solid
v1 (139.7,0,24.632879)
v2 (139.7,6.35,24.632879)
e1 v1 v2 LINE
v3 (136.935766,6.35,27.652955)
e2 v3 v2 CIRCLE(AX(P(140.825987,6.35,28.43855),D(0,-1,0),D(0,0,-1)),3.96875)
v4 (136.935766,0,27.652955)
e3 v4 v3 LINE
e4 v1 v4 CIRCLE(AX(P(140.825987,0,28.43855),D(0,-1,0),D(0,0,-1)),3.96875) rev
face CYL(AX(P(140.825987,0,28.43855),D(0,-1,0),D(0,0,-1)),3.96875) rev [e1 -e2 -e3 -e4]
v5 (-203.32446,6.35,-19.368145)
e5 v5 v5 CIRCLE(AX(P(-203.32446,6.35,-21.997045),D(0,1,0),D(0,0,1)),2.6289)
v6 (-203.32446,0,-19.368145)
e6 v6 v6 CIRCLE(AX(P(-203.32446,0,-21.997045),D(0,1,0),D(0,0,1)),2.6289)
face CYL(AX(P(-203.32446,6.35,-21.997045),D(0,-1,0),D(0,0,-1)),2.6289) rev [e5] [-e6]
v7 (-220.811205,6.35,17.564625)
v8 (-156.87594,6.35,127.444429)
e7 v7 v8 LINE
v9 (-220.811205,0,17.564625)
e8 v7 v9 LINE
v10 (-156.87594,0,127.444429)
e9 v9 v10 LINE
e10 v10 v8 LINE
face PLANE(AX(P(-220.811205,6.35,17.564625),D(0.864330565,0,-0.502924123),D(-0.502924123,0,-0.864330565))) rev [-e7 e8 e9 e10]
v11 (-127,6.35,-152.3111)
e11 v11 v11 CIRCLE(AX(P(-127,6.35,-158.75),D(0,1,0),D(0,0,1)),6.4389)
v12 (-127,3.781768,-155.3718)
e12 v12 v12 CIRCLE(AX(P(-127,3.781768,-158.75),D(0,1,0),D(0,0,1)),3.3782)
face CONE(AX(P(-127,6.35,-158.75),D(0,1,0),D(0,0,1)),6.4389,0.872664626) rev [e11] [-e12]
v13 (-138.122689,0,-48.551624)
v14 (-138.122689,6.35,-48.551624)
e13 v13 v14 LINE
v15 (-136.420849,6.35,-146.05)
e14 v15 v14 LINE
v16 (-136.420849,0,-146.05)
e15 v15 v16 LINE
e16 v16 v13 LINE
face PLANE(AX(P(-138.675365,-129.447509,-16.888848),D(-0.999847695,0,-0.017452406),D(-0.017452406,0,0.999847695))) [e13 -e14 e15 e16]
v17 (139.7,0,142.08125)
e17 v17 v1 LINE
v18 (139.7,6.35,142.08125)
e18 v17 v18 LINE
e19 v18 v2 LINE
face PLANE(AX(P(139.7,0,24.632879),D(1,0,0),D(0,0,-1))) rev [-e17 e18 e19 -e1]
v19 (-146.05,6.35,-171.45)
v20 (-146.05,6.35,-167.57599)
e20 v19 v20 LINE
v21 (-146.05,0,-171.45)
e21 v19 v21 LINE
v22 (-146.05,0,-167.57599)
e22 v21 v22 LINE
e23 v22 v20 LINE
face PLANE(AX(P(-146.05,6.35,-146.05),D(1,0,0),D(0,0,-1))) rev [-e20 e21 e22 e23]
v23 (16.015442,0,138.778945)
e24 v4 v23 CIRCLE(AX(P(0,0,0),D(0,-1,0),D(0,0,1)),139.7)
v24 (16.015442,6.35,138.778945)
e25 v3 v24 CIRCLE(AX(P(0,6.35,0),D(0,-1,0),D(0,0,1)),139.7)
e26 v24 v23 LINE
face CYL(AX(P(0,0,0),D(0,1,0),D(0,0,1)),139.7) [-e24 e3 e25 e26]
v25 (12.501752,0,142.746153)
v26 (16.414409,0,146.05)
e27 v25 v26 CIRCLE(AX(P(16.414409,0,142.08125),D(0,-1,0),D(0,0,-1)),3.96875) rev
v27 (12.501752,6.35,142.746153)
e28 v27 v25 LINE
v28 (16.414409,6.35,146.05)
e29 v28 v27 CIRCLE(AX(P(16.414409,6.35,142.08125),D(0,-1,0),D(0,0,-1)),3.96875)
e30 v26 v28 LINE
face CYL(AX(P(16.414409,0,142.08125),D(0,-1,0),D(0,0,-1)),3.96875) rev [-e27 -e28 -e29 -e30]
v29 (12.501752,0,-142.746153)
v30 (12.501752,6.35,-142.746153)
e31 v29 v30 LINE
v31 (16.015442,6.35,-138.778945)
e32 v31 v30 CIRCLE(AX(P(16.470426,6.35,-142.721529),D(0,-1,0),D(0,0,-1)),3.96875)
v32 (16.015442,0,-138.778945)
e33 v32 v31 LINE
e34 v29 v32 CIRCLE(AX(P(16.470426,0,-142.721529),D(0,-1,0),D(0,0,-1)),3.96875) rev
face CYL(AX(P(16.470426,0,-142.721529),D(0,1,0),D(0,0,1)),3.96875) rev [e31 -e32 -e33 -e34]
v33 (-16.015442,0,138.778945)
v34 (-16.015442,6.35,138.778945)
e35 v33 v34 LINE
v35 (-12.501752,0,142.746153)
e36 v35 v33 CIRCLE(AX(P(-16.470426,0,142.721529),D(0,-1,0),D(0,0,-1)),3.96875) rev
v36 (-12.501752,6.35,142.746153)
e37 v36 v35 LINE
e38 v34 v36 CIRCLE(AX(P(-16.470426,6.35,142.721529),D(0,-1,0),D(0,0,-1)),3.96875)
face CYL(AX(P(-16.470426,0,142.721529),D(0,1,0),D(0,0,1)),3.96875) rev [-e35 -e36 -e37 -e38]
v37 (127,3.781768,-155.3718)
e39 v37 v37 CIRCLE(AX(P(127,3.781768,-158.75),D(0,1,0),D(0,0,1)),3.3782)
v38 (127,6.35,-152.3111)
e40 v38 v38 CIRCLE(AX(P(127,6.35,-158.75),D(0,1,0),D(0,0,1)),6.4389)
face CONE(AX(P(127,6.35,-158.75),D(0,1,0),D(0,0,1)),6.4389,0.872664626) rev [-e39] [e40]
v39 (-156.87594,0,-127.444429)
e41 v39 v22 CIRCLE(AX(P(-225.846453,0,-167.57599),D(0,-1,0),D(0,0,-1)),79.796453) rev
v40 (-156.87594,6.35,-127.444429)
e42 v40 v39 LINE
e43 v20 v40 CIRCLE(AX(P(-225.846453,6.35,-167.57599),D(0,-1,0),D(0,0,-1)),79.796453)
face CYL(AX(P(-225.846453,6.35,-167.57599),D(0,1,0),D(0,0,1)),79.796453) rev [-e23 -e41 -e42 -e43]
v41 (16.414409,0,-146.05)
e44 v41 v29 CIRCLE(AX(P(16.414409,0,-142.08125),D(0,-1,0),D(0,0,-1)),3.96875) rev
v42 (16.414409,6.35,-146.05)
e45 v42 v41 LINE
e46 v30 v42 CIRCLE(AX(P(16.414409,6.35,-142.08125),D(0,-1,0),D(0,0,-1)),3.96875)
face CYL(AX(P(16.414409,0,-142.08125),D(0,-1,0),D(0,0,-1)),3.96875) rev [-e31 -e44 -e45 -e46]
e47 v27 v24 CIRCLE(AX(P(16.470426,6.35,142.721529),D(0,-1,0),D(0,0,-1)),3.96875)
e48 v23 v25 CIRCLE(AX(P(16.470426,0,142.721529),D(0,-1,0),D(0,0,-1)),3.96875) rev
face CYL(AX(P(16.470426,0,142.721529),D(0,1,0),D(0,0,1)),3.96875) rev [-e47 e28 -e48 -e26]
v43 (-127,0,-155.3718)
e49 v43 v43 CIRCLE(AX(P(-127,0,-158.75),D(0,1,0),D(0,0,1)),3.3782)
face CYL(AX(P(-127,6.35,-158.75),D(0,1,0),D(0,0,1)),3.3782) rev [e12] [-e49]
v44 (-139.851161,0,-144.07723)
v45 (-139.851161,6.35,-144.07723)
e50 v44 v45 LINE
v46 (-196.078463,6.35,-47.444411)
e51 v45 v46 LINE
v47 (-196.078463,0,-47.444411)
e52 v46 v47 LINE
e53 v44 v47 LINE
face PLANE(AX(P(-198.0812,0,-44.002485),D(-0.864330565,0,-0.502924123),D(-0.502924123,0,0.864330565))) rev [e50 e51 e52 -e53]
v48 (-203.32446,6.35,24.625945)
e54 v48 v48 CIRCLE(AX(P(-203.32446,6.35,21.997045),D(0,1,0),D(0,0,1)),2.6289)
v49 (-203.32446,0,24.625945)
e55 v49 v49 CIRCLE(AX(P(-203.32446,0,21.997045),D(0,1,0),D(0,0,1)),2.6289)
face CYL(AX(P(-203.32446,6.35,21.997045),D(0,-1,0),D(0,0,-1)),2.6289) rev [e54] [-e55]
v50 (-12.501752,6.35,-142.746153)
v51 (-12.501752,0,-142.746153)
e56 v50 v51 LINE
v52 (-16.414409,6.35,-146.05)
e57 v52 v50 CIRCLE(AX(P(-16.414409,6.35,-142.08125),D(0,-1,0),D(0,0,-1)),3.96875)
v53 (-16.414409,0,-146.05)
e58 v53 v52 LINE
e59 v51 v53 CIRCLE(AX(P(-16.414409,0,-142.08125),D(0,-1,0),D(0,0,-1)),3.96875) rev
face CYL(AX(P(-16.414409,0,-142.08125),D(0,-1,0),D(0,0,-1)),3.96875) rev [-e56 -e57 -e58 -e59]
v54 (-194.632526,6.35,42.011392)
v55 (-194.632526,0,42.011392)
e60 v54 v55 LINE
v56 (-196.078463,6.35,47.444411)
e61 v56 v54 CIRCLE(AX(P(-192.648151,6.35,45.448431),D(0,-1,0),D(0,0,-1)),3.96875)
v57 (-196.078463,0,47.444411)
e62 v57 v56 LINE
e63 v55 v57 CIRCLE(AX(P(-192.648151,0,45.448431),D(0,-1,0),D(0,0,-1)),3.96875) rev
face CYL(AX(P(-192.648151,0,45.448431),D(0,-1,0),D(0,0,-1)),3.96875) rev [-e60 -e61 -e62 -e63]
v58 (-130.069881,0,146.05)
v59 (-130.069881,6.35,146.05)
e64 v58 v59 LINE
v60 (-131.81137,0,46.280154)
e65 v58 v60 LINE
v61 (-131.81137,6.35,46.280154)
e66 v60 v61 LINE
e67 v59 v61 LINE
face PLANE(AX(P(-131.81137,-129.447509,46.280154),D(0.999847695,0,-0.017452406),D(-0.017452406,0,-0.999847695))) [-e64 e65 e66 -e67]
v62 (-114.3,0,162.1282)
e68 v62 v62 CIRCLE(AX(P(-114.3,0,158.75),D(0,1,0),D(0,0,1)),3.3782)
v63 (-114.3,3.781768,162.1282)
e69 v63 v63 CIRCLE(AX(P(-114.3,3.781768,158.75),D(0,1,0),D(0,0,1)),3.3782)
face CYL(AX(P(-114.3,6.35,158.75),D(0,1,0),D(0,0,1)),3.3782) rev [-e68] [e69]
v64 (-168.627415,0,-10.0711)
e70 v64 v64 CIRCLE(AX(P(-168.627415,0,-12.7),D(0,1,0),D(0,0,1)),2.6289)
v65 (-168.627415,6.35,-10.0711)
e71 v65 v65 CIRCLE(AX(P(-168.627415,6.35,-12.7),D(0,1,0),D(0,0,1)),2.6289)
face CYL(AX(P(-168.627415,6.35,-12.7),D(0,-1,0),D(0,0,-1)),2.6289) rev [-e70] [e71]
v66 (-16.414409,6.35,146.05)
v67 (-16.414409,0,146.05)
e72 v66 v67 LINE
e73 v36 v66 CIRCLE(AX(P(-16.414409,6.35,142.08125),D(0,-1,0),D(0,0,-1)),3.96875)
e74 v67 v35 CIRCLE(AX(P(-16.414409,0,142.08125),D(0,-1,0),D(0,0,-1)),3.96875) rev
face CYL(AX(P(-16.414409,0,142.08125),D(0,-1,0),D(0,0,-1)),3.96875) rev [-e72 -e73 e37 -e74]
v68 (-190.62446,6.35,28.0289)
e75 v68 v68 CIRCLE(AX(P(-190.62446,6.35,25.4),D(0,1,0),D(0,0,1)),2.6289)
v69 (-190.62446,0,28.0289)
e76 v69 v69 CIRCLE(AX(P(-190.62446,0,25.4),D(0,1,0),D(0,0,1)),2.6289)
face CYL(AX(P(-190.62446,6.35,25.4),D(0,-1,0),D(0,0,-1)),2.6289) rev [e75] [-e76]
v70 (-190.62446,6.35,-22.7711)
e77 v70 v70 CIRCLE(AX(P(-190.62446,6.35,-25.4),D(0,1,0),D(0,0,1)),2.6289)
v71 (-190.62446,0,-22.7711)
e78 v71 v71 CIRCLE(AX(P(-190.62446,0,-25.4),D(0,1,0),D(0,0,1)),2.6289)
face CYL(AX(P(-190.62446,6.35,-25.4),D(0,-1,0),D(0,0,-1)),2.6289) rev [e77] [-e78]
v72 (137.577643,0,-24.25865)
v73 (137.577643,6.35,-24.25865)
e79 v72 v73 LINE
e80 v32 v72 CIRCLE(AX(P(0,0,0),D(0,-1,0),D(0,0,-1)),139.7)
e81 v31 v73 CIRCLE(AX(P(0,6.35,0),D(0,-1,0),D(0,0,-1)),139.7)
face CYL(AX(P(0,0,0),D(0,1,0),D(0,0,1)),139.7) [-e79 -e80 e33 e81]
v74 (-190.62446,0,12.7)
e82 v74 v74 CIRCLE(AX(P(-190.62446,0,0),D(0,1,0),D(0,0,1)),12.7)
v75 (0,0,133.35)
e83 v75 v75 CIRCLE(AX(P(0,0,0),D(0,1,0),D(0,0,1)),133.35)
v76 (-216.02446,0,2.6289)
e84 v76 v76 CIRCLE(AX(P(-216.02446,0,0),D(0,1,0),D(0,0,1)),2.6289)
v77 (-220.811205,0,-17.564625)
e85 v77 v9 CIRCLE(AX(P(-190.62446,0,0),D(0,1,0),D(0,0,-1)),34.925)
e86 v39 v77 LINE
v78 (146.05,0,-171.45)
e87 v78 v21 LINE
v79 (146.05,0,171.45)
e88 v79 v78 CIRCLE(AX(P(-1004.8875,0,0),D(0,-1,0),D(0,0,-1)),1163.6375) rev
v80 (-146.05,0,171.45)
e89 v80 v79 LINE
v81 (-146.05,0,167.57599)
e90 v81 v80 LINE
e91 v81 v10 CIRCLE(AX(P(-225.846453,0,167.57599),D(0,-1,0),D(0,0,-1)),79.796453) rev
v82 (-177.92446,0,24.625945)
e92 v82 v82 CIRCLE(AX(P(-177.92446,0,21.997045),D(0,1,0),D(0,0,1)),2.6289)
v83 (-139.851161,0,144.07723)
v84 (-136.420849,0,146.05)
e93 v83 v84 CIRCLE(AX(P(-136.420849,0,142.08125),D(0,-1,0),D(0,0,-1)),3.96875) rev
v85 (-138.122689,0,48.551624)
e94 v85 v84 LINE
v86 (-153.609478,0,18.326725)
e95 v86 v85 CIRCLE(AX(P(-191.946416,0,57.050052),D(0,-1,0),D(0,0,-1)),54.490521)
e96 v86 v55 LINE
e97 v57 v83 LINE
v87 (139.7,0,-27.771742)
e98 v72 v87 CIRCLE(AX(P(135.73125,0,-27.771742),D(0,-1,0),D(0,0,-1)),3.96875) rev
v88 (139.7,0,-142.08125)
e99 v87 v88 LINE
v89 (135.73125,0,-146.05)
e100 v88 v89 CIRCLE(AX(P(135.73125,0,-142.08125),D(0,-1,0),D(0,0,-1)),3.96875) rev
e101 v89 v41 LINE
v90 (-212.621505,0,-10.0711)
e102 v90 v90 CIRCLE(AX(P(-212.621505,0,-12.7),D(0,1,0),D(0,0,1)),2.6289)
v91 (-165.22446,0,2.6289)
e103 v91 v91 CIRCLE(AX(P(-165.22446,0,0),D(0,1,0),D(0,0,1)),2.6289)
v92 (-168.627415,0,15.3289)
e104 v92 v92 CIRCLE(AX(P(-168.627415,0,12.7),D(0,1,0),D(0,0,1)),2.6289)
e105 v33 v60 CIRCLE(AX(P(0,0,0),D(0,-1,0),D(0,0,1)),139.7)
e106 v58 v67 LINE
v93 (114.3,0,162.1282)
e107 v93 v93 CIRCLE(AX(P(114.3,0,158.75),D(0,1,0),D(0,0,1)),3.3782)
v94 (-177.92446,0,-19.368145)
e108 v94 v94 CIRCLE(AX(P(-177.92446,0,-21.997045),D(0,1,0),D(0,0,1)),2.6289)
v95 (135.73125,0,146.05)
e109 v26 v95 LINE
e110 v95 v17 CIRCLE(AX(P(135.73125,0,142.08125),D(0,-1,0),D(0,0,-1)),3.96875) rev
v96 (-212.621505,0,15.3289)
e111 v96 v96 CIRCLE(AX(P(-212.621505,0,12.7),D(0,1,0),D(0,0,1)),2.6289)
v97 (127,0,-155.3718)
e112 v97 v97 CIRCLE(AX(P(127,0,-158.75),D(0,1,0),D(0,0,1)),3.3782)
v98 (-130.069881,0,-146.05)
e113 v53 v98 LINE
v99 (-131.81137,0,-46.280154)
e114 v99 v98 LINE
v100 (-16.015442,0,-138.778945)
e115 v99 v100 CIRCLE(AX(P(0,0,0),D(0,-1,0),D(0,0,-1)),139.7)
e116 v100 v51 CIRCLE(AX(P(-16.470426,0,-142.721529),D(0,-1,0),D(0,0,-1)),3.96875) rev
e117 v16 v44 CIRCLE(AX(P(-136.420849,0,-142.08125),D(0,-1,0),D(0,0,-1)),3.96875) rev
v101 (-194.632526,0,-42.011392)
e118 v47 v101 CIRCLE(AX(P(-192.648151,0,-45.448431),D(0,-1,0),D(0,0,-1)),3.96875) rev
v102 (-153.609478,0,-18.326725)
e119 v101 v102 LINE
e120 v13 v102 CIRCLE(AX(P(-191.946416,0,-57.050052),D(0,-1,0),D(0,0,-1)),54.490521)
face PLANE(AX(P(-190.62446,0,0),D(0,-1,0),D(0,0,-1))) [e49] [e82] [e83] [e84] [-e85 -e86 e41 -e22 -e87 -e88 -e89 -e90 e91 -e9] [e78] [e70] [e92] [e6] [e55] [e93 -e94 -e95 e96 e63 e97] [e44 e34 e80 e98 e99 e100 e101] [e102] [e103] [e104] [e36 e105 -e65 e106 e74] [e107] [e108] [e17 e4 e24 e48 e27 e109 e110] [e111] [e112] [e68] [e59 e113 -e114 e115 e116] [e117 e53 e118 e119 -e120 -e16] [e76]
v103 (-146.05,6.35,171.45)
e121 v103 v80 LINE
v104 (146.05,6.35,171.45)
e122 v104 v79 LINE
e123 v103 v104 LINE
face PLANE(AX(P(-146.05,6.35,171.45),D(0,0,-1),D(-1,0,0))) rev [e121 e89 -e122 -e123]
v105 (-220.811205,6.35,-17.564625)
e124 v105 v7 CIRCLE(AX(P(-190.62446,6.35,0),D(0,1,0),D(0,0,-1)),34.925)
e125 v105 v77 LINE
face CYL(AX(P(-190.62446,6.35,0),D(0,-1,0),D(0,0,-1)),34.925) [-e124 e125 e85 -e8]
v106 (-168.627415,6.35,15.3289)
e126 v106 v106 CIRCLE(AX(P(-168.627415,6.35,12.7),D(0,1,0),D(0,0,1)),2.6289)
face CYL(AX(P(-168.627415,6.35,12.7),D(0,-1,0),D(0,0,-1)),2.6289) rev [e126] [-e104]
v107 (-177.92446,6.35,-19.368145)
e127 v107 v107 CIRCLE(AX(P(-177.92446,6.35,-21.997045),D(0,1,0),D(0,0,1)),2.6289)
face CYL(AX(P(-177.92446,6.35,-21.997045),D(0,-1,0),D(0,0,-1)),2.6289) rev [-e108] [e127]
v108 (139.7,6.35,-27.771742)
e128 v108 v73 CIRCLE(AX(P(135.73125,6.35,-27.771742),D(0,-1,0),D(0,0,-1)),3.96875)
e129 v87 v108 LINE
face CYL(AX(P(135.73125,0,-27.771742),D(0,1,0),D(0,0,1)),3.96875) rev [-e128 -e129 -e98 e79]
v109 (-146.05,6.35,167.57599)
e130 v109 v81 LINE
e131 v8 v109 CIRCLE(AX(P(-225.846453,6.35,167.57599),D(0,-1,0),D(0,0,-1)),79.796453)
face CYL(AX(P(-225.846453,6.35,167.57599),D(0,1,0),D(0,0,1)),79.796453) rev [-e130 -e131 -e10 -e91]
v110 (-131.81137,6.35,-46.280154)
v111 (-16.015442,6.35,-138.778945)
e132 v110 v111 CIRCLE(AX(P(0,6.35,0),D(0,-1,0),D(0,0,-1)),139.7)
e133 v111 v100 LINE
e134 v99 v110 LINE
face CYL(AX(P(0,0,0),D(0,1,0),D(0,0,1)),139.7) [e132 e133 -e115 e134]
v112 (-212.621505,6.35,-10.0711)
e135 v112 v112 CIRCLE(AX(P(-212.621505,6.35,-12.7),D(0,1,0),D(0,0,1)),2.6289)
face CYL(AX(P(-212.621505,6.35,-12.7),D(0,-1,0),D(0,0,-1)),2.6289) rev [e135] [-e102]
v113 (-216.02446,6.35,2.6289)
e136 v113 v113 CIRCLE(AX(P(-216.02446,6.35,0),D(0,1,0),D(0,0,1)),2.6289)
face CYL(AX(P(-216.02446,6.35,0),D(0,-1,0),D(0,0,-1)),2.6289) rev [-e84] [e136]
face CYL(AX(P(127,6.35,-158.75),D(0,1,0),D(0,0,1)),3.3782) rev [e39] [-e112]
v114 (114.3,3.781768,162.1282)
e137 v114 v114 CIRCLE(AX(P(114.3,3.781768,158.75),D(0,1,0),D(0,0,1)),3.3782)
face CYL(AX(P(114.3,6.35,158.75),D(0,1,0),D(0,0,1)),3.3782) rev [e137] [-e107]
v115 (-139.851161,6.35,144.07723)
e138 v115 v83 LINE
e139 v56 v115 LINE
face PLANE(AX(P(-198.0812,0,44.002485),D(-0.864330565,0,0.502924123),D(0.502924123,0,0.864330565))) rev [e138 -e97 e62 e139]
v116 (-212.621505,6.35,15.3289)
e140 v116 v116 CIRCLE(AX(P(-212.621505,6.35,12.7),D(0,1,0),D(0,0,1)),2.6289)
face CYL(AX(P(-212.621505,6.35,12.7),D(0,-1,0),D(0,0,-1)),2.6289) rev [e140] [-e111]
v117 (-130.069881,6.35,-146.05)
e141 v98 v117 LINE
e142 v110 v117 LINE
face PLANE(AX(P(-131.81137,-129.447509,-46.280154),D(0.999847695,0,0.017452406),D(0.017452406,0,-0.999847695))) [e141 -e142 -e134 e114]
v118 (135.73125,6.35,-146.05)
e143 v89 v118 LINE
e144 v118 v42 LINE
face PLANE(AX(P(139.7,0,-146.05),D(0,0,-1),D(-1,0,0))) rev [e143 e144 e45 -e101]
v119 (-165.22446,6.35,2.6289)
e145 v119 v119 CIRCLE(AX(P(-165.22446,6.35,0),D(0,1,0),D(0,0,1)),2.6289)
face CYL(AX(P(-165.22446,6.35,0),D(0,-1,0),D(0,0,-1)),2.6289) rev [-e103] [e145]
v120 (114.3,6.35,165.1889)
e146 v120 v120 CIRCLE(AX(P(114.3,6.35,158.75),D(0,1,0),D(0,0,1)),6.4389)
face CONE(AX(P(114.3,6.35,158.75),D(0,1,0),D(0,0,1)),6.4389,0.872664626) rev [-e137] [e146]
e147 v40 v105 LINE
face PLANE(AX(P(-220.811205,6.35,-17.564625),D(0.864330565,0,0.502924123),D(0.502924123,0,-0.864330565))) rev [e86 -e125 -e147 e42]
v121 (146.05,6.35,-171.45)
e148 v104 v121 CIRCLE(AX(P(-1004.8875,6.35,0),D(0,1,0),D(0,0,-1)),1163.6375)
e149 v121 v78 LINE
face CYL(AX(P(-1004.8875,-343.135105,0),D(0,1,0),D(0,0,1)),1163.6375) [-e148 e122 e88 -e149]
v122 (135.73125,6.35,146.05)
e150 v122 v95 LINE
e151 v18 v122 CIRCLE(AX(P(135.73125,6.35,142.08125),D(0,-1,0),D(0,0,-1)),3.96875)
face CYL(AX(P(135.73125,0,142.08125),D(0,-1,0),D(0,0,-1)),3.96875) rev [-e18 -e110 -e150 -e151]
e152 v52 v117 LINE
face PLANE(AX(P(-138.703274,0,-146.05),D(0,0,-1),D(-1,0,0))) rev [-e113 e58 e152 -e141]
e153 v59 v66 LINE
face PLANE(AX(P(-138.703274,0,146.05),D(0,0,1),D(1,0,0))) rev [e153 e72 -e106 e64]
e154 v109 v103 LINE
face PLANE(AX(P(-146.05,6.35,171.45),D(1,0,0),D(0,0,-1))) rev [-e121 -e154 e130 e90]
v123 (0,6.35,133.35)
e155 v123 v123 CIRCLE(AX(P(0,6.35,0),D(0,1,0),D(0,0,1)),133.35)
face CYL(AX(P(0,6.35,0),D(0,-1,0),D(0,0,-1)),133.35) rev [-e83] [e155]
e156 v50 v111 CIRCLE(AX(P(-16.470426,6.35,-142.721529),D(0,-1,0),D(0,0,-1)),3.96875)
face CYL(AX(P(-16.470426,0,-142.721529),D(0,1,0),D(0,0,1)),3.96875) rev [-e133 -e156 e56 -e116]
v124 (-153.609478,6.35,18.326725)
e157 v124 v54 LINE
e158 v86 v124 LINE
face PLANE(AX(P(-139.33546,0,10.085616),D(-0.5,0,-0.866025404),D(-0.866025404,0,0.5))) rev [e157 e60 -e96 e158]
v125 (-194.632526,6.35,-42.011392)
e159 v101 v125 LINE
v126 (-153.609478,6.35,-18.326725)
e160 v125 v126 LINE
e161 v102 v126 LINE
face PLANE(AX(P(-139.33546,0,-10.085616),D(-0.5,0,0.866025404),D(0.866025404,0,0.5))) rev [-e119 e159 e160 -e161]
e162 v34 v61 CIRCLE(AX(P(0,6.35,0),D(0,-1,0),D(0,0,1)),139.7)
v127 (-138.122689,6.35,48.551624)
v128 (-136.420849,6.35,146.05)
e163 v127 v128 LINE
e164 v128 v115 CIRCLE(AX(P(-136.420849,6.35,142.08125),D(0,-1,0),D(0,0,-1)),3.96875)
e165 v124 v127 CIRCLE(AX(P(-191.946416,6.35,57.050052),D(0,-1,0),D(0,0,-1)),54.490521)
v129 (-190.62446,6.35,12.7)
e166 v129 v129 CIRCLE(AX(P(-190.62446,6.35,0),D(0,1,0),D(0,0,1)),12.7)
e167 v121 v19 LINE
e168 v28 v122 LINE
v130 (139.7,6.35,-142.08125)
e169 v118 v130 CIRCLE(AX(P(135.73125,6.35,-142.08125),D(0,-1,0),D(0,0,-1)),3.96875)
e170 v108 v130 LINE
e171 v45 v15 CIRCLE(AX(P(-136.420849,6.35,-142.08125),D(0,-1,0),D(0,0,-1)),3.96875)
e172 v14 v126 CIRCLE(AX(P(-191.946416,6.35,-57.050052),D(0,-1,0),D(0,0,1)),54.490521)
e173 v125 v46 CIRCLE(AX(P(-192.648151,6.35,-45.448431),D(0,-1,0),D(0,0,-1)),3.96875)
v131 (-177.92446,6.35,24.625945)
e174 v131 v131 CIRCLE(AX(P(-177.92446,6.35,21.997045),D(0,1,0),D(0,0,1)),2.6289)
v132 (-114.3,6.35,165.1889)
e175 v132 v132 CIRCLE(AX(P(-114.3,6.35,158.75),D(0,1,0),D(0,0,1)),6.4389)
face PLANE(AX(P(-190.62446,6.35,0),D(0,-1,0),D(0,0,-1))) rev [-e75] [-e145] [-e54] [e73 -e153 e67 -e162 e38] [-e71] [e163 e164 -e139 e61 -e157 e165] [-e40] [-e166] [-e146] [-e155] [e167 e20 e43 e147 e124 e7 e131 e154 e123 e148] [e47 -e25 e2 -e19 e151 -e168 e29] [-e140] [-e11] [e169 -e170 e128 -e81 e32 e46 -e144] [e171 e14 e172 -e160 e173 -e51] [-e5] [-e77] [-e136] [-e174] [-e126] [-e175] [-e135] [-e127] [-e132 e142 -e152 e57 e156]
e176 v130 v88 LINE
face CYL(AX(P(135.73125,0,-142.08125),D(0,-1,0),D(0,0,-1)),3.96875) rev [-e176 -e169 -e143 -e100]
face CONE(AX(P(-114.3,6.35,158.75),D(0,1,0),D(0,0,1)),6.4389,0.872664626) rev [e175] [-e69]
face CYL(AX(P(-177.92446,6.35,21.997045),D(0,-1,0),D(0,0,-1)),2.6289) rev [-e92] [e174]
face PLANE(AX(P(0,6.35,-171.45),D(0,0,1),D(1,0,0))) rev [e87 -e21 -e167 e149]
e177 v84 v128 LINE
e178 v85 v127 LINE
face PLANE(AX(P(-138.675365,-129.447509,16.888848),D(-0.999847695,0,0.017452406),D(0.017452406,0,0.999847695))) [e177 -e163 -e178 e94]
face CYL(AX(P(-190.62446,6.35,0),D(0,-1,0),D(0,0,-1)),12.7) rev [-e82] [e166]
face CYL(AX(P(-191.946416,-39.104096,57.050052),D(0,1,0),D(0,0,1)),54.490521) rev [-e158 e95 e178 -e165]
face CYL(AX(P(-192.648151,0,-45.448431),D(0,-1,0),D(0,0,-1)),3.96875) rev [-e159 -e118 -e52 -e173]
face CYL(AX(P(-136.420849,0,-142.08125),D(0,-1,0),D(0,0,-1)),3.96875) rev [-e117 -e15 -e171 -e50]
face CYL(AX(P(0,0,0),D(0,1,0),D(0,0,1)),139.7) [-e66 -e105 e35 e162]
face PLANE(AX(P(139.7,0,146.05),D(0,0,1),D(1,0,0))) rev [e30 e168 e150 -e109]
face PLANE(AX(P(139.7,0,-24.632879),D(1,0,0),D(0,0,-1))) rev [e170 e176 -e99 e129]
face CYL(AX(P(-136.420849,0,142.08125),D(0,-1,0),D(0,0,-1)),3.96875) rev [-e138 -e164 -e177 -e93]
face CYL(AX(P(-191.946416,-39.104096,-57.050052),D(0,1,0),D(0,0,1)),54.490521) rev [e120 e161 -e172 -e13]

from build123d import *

# Parameters (mm, degrees)
SKETCH1_R                                           = 133.35
SKETCH1_R_2                                         = 12.7
SKETCH1_R_3                                         = 2.6289
EXTRUDE_CENTER_HOLE_DEPTH                           = 6.35
CSK_FOR_1_4_FLAT_HEAD_MACHINE_SCREW_100_D           = 6.7564
CSK_FOR_1_4_FLAT_HEAD_MACHINE_SCREW_100_CSINK_D     = 12.8778
CSK_FOR_1_4_FLAT_HEAD_MACHINE_SCREW_100_CSINK_ANGLE = 100
FILLET1_R                                           = 79.796453401
SLOTTING_DEPTH                                      = 284.386633253
FILLET5_R                                           = 3.96875
FILLET6_R                                           = 3.96875
FILLET7_R                                           = 3.96875
FILLET8_R                                           = 3.96875
MOTOR_SIDE_SUPPORTS_DEPTH                           = 6.35
OPPOSITE_MOTOR_SIDE_THICKENING_DEPTH                = 6.35
MOTOR_SIDE_THICKENING_DEPTH                         = 6.35


with BuildPart() as part:
    # Sketch1 → Extrude & center hole (new body)
    with BuildSketch(Plane(origin=(0, 0, 0), x_dir=(1, 0, 0), z_dir=(0, 1, 0))):
        with BuildLine():
            Line((0, 171.45), (146.05, 171.45))
            Line((146.05, 171.45), (146.05, 0))
            Line((146.05, 0), (146.05, -171.45))
            Line((146.05, -171.45), (-146.05, -171.45))
            Line((-146.05, -171.45), (-146.05, -146.05))
            Line((-146.05, -146.05), (-220.811204994, -17.564625007))
            ThreePointArc((-220.811204994, -17.564625007), (-225.54946, 0), (-220.811204994, 17.564625007))
            Line((-220.811204994, 17.564625007), (-146.05, 146.05))
            Line((-146.05, 146.05), (-146.05, 171.45))
            Line((-146.05, 171.45), (0, 171.45))
        make_face()
        with Locations(Location((0, 0, 0), (0, 0, 270))):
            Circle(SKETCH1_R, mode=Mode.SUBTRACT)
        with Locations(Location((-190.62446, 0, 0), (0, 0, 270))):
            Circle(SKETCH1_R_2, mode=Mode.SUBTRACT)
        with Locations(Location((-190.62446, 25.4, 0), (0, 0, 270))):
            Circle(SKETCH1_R_3, mode=Mode.SUBTRACT)
        with Locations(Location((-177.92446, 21.997045256, 0), (0, 0, 270))):
            Circle(SKETCH1_R_3, mode=Mode.SUBTRACT)
        with Locations(Location((-168.627414744, 12.7, 0), (0, 0, 270))):
            Circle(SKETCH1_R_3, mode=Mode.SUBTRACT)
        with Locations(Location((-165.22446, 0, 0), (0, 0, 270))):
            Circle(SKETCH1_R_3, mode=Mode.SUBTRACT)
        with Locations(Location((-168.627414744, -12.7, 0), (0, 0, 270))):
            Circle(SKETCH1_R_3, mode=Mode.SUBTRACT)
        with Locations(Location((-177.92446, -21.997045256, 0), (0, 0, 270))):
            Circle(SKETCH1_R_3, mode=Mode.SUBTRACT)
        with Locations(Location((-190.62446, -25.4, 0), (0, 0, 270))):
            Circle(SKETCH1_R_3, mode=Mode.SUBTRACT)
        with Locations(Location((-203.32446, -21.997045256, 0), (0, 0, 270))):
            Circle(SKETCH1_R_3, mode=Mode.SUBTRACT)
        with Locations(Location((-212.621505256, -12.7, 0), (0, 0, 270))):
            Circle(SKETCH1_R_3, mode=Mode.SUBTRACT)
        with Locations(Location((-216.02446, 0, 0), (0, 0, 270))):
            Circle(SKETCH1_R_3, mode=Mode.SUBTRACT)
        with Locations(Location((-212.621505256, 12.7, 0), (0, 0, 270))):
            Circle(SKETCH1_R_3, mode=Mode.SUBTRACT)
        with Locations(Location((-203.32446, 21.997045256, 0), (0, 0, 270))):
            Circle(SKETCH1_R_3, mode=Mode.SUBTRACT)
    extrude(amount=EXTRUDE_CENTER_HOLE_DEPTH)

    # CSK for 1/4 Flat Head Machine Screw (100)1 (through all)
    with Locations(Plane(origin=(0, 6.35, 0), x_dir=(1, 0, 0), z_dir=(0, 1, 0))):
        with Locations((-114.3, -158.75), (114.3, -158.75), (127, 158.75), (-127, 158.75)):
            CounterSinkHole(CSK_FOR_1_4_FLAT_HEAD_MACHINE_SCREW_100_D / 2, CSK_FOR_1_4_FLAT_HEAD_MACHINE_SCREW_100_CSINK_D / 2, counter_sink_angle=CSK_FOR_1_4_FLAT_HEAD_MACHINE_SCREW_100_CSINK_ANGLE)

    # Fillet1
    fillet1_edges = [part.edges().sort_by_distance(p)[0] for p in [
        (-146.05, 3.175, 146.05),
        (-146.05, 3.175, -146.05),
    ]]
    fillet(fillet1_edges, radius=FILLET1_R)

    # Sketch6 → Slotting (cut, through all)
    with BuildSketch(Plane(origin=(0, 6.35, 0), x_dir=(1, 0, 0), z_dir=(0, 1, 0))):
        with BuildLine():
            Line((-139.335459755, 10.085616241), (-198.081200359, 44.002485392))
            Line((-198.081200359, 44.002485392), (-138.703273811, 146.05))
            Line((-138.703273811, 146.05), (-12.777719308, 146.05))
            Line((-12.777719308, 146.05), (-12.175657262, 139.168399323))
            ThreePointArc((-12.175657262, 139.168399323), (-99.521333728, 98.03873792), (-139.335459755, 10.085616241))
        make_face()
        with BuildLine():
            Line((-198.081200359, -44.002485392), (-138.703273811, -146.05))
            Line((-138.703273811, -146.05), (-12.777719308, -146.05))
            Line((-12.777719308, -146.05), (-12.175657262, -139.168399323))
            ThreePointArc((-12.175657262, -139.168399323), (-99.521333728, -98.03873792), (-139.335459755, -10.085616241))
            Line((-139.335459755, -10.085616241), (-198.081200359, -44.002485392))
        make_face()
        with BuildLine():
            Line((139.7, 24.632879205), (139.7, 146.05))
            Line((139.7, 146.05), (12.777719308, 146.05))
            Line((12.777719308, 146.05), (12.175657262, 139.168399323))
            ThreePointArc((12.175657262, 139.168399323), (94.379952004, 102.997643952), (137.577643096, 24.25865042))
            Line((137.577643096, 24.25865042), (139.7, 24.632879205))
        make_face()
        with BuildLine():
            Line((137.577643096, -24.25865042), (139.7, -24.632879205))
            Line((139.7, -24.632879205), (139.7, -146.05))
            Line((139.7, -146.05), (12.777719308, -146.05))
            Line((12.777719308, -146.05), (12.175657262, -139.168399323))
            ThreePointArc((12.175657262, -139.168399323), (94.379952004, -102.997643952), (137.577643096, -24.25865042))
        make_face()
    extrude(amount=-SLOTTING_DEPTH, mode=Mode.SUBTRACT)

    # Fillet5
    # the kernel refuses this fillet: 3.96875 mm, written as the material it adds along each edge
    with BuildSketch(Plane(origin=(12.777719308, 6.35, 146.05), x_dir=(1, 0, 0), z_dir=(0, -1, 0))) as fillet5_piece_1:
        with BuildLine():
            CenterArc((FILLET5_R * 0.916331174017, -FILLET5_R), FILLET5_R, 90, 85)
            Line((-FILLET5_R * 0.0798635240743, -FILLET5_R * 0.912844257252), (-FILLET5_R * 0.0997874180362, -FILLET5_R * 0.911101142397))
            Line((-FILLET5_R * 0.0997874180362, -FILLET5_R * 0.911101142397), (-FILLET5_R * 0.0183266234803, FILLET5_R * 0.02))
            Line((-FILLET5_R * 0.0183266234803, FILLET5_R * 0.02), (FILLET5_R * 0.916331174017, FILLET5_R * 0.02))
            Line((FILLET5_R * 0.916331174017, FILLET5_R * 0.02), (FILLET5_R * 0.916331174017, 0))
        make_face()
    extrude(amount=6.35)
    with BuildSketch(Plane(origin=(139.7, 6.35, 146.05), x_dir=(0, 0, -1), z_dir=(0, -1, 0))) as fillet5_piece_2:
        with BuildLine():
            CenterArc((FILLET5_R, -FILLET5_R), FILLET5_R, 90, 90)
            Line((0, -FILLET5_R), (-FILLET5_R * 0.02, -FILLET5_R))
            Line((-FILLET5_R * 0.02, -FILLET5_R), (-FILLET5_R * 0.02, FILLET5_R * 0.02))
            Line((-FILLET5_R * 0.02, FILLET5_R * 0.02), (FILLET5_R, FILLET5_R * 0.02))
            Line((FILLET5_R, FILLET5_R * 0.02), (FILLET5_R, 0))
        make_face()
    extrude(amount=6.35)
    with BuildSketch(Plane(origin=(137.577643096, 6.35, 24.25865042), x_dir=(-0.1858109279548849, 0, 0.9825855174245877), z_dir=(0, -1, 0))) as fillet5_piece_3:
        with BuildLine():
            CenterArc((3.50353097, -3.968446647), FILLET5_R, 90.708414928, 62.101221503)
            Line((-0.026645322, -2.154932955), (-0.097248847, -2.118662681))
            ThreePointArc((-0.097248847, -2.118662681), (-0.092691594, -1.076485096), (-0.079368933, 0.000981381))
            Line((-0.079368933, 0.000981381), (0.000981381, 0.079368933))
            ThreePointArc((0.000981381, 0.079368933), (1.727230954, 0.068696973), (3.453480528, 0.079368933))
            Line((3.453480528, 0.079368933), (3.454461909, 0))
        make_face()
    extrude(amount=6.35)
    with BuildSketch(Plane(origin=(12.175657262, 6.35, 139.168399323), x_dir=(0.9948957271243674, 0, -0.10090833538254544), z_dir=(0, -1, 0))) as fillet5_piece_4:
        with BuildLine():
            CenterArc((3.914306477, 3.968371339), FILLET5_R, 180.791478855, 88.41704229)
            Line((-0.054064862, 3.91354912), (-0.133432289, 3.912452675))
            Line((-0.133432289, 3.912452675), (-0.079367427, -0.001096444))
            Line((-0.079367427, -0.001096444), (0.001096444, -0.079367427))
            ThreePointArc((0.001096444, -0.079367427), (1.929742129, -0.066046144), (3.858387813, -0.079367427))
            Line((3.858387813, -0.079367427), (3.859484258, 0))
        make_face()
    extrude(amount=6.35)

    # Fillet6
    # the kernel refuses this fillet: 3.96875 mm, written as the material it adds along each edge
    with BuildSketch(Plane(origin=(139.7, 6.35, -24.632879205), x_dir=(-0.9848077530122098, 0, 0.17364817766692084), z_dir=(0, -1, 0))) as fillet6_piece_1:
        with BuildLine():
            CenterArc((3.363398048, 3.780342152), FILLET6_R, 190, 62.274703633)
            Line((-0.545057721, 3.091175947), (-0.623226837, 3.077392622))
            Line((-0.623226837, 3.077392622), (-0.078169115, -0.013783324))
            Line((-0.078169115, -0.013783324), (0, -0.079375))
            ThreePointArc((0, -0.079375), (1.07754884, -0.079375), (2.130931673, -0.075606843))
            Line((2.130931673, -0.075606843), (2.15509768, 0))
        make_face()
    extrude(amount=6.35)
    with BuildSketch(Plane(origin=(139.7, 6.35, -146.05), x_dir=(-1, 0, 0), z_dir=(0, -1, 0))) as fillet6_piece_2:
        with BuildLine():
            CenterArc((FILLET6_R, -FILLET6_R), FILLET6_R, 90, 90)
            Line((0, -FILLET6_R), (-FILLET6_R * 0.02, -FILLET6_R))
            Line((-FILLET6_R * 0.02, -FILLET6_R), (-FILLET6_R * 0.02, FILLET6_R * 0.02))
            Line((-FILLET6_R * 0.02, FILLET6_R * 0.02), (FILLET6_R, FILLET6_R * 0.02))
            Line((FILLET6_R, FILLET6_R * 0.02), (FILLET6_R, 0))
        make_face()
    extrude(amount=6.35)
    with BuildSketch(Plane(origin=(12.175657262, 6.35, -139.168399323), x_dir=(0.9948957271243674, 0, 0.10090833538254544), z_dir=(0, -1, 0))) as fillet6_piece_3:
        with BuildLine():
            CenterArc((3.914306477, -3.968371339), FILLET6_R, 90.791478855, 88.41704229)
            Line((-0.054064862, -3.91354912), (-0.133432289, -3.912452675))
            Line((-0.133432289, -3.912452675), (-0.079367427, 0.001096444))
            Line((-0.079367427, 0.001096444), (0.001096444, 0.079367427))
            ThreePointArc((0.001096444, 0.079367427), (1.929742129, 0.066046144), (3.858387813, 0.079367427))
            Line((3.858387813, 0.079367427), (3.859484258, 0))
        make_face()
    extrude(amount=6.35)
    with BuildSketch(Plane(origin=(12.777719308, 6.35, -146.05), x_dir=(-0.0871557427476581, 0, 0.9961946980917455), z_dir=(0, -1, 0))) as fillet6_piece_4:
        with BuildLine():
            CenterArc((FILLET6_R * 0.916331174017, -FILLET6_R), FILLET6_R, 90, 85)
            Line((-FILLET6_R * 0.0798635240743, -FILLET6_R * 0.912844257252), (-FILLET6_R * 0.0997874180361, -FILLET6_R * 0.911101142397))
            Line((-FILLET6_R * 0.0997874180361, -FILLET6_R * 0.911101142397), (-FILLET6_R * 0.0183266234803, FILLET6_R * 0.02))
            Line((-FILLET6_R * 0.0183266234803, FILLET6_R * 0.02), (FILLET6_R * 0.916331174017, FILLET6_R * 0.02))
            Line((FILLET6_R * 0.916331174017, FILLET6_R * 0.02), (FILLET6_R * 0.916331174017, 0))
        make_face()
    extrude(amount=6.35)

    # Fillet7
    # the kernel refuses this fillet: 3.96875 mm, written as the material it adds along each edge
    with BuildSketch(Plane(origin=(-139.335459755, 6.35, -10.085616241), x_dir=(-0.8660254037844399, 0, -0.4999999999999978), z_dir=(0, -1, 0))) as fillet7_piece_1:
        with BuildLine():
            CenterArc((6.18207927, 3.96875), FILLET7_R, 156.640476374, 113.359523626)
            ThreePointArc((2.538628022, 5.542357182), (1.299549112, 2.757329669), (0, 0))
            Line((0, 0), (6.18207927, 0))
        make_face()
    extrude(amount=6.35)
    with BuildSketch(Plane(origin=(-198.081200359, 6.35, -44.002485392), x_dir=(0.5029241233239898, 0, -0.8643305653387461), z_dir=(0, -1, 0))) as fillet7_piece_2:
        with BuildLine():
            CenterArc((FILLET7_R * 1.00338551513, FILLET7_R), FILLET7_R, 179.806352255, 90.193647745)
            Line((FILLET7_R * 0.00339122661612, FILLET7_R * 1.00337978431), (0, 0))
            Line((0, 0), (FILLET7_R * 1.00338551513, 0))
        make_face()
    extrude(amount=6.35)
    with BuildSketch(Plane(origin=(-138.703273811, 6.35, -146.05), x_dir=(1, 0, 0), z_dir=(0, -1, 0))) as fillet7_piece_3:
        with BuildLine():
            CenterArc((FILLET7_R * 0.575099269434, FILLET7_R), FILLET7_R, 210.193647745, 59.806352255)
            Line((-FILLET7_R * 0.289231295904, FILLET7_R * 0.497075876676), (0, 0))
            Line((0, 0), (FILLET7_R * 0.575099269434, 0))
        make_face()
    extrude(amount=6.35)
    with BuildSketch(Plane(origin=(-12.175657262, 6.35, -139.168399323), x_dir=(-0.08715574274765879, 0, -0.9961946980917455), z_dir=(0, -1, 0))) as fillet7_piece_4:
        with BuildLine():
            CenterArc((3.913922549, -3.96875), FILLET7_R, 90, 88.41704229)
            ThreePointArc((-0.05331288, -3.859116022), (-0.013328856, -1.929742129), (0, 0))
            Line((0, 0), (3.913922549, 0))
        make_face()
    extrude(amount=6.35)
    with BuildSketch(Plane(origin=(-12.777719308, 6.35, -146.05), x_dir=(-1, 0, 0), z_dir=(0, -1, 0))) as fillet7_piece_5:
        with BuildLine():
            CenterArc((FILLET7_R * 0.916331174017, -FILLET7_R), FILLET7_R, 90, 85)
            Line((-FILLET7_R * 0.0798635240743, -FILLET7_R * 0.912844257252), (0, 0))
            Line((0, 0), (FILLET7_R * 0.916331174017, 0))
        make_face()
    extrude(amount=6.35)

    # Fillet8
    # the kernel refuses this fillet: 3.96875 mm, written as the material it adds along each edge
    with BuildSketch(Plane(origin=(-138.703273811, 6.35, 146.05), x_dir=(1, 0, 0), z_dir=(0, -1, 0))) as fillet8_piece_1:
        with BuildLine():
            CenterArc((FILLET8_R * 0.575099269434, -FILLET8_R), FILLET8_R, 90, 59.806352255)
            Line((-FILLET8_R * 0.289231295904, -FILLET8_R * 0.497075876676), (0, 0))
            Line((0, 0), (FILLET8_R * 0.575099269434, 0))
        make_face()
    extrude(amount=6.35)
    with BuildSketch(Plane(origin=(-12.777719308, 6.35, 146.05), x_dir=(0.08715574274765858, 0, -0.9961946980917455), z_dir=(0, -1, 0))) as fillet8_piece_2:
        with BuildLine():
            CenterArc((FILLET8_R * 0.916331174017, -FILLET8_R), FILLET8_R, 90, 85)
            Line((-FILLET8_R * 0.0798635240743, -FILLET8_R * 0.912844257252), (0, 0))
            Line((0, 0), (FILLET8_R * 0.916331174017, 0))
        make_face()
    extrude(amount=6.35)
    with BuildSketch(Plane(origin=(-12.175657262, 6.35, 139.168399323), x_dir=(-0.08715574274765799, 0, 0.9961946980917455), z_dir=(0, -1, 0))) as fillet8_piece_3:
        with BuildLine():
            CenterArc((3.913922549, 3.96875), FILLET8_R, 181.58295771, 88.41704229)
            ThreePointArc((-0.05331288, 3.859116022), (-0.013328856, 1.929742129), (0, 0))
            Line((0, 0), (3.913922549, 0))
        make_face()
    extrude(amount=6.35)
    with BuildSketch(Plane(origin=(-139.335459755, 6.35, 10.085616241), x_dir=(0.09393921500732419, 0, 0.9955779346107505), z_dir=(0, -1, 0))) as fillet8_piece_4:
        with BuildLine():
            CenterArc((6.182685688, 3.96780523), FILLET8_R, 155.390268268, 113.359523626)
            Line((2.574435545, 5.620532513), (0, 0))
            ThreePointArc((0, 0), (3.048046726, 0.033255887), (6.096093452, 0))
        make_face()
    extrude(amount=6.35)
    with BuildSketch(Plane(origin=(-198.081200359, 6.35, 44.002485392), x_dir=(0.5029241233239921, 0, 0.8643305653387446), z_dir=(0, -1, 0))) as fillet8_piece_5:
        with BuildLine():
            CenterArc((FILLET8_R * 1.00338551513, -FILLET8_R), FILLET8_R, 90, 90.193647745)
            Line((FILLET8_R * 0.00339122661611, -FILLET8_R * 1.00337978431), (0, 0))
            Line((0, 0), (FILLET8_R * 1.00338551513, 0))
        make_face()
    extrude(amount=6.35)

    # Sketch7 → Motor side supports (add)
    with BuildSketch(Plane(origin=(0, 6.35, 0), x_dir=(1, 0, 0), z_dir=(0, 1, 0))):
        with BuildLine():
            Line((-138.675364887, 16.888847605), (-136.420848586, 146.05))
            Line((-136.420848586, 146.05), (-130.069881303, 146.05))
            Line((-130.069881303, 146.05), (-131.811370449, 46.280153634))
            ThreePointArc((-131.811370449, 46.280153634), (-136.03944544, 31.770415237), (-138.675364887, 16.888847605))
        make_face()
        with BuildLine():
            Line((-138.675364887, -16.888847605), (-136.420848586, -146.05))
            Line((-136.420848586, -146.05), (-130.069881303, -146.05))
            Line((-130.069881303, -146.05), (-131.811370449, -46.280153634))
            ThreePointArc((-131.811370449, -46.280153634), (-136.03944544, -31.770415237), (-138.675364887, -16.888847605))
        make_face()
    extrude(amount=-MOTOR_SIDE_SUPPORTS_DEPTH)

    # Sketch9 → Opposite motor side thickening (add)
    with BuildSketch(Plane(origin=(0, 6.35, 0), x_dir=(1, 0, 0), z_dir=(0, 1, 0))):
        with BuildLine():
            Line((146.05, 171.45), (146.05, -171.45))
            ThreePointArc((146.05, -171.45), (158.75, 0), (146.05, 171.45))
        make_face()
    extrude(amount=-OPPOSITE_MOTOR_SIDE_THICKENING_DEPTH)

    # Sketch10 → Motor side thickening (add)
    with BuildSketch(Plane(origin=(0, 6.35, 0), x_dir=(1, 0, 0), z_dir=(0, 1, 0))):
        with BuildLine():
            Line((-138.122689066, 48.551624174), (-138.675364887, 16.888847605))
            ThreePointArc((-138.675364887, 16.888847605), (-138.719566803, 16.521857823), (-138.762797521, 16.154752368))
            ThreePointArc((-138.762797521, 16.154752368), (-140.922940162, 13.067496841), (-144.689297451, 13.176655876))
            Line((-144.689297451, 13.176655876), (-153.609478479, 18.326724794))
            ThreePointArc((-153.609478479, 18.326724794), (-143.451229081, 32.201838816), (-138.122689066, 48.551624174))
        make_face()
        with BuildLine():
            Line((-153.609478479, -18.326724794), (-144.689297451, -13.176655876))
            ThreePointArc((-144.689297451, -13.176655876), (-140.922940162, -13.067496841), (-138.762797521, -16.154752368))
            ThreePointArc((-138.762797521, -16.154752368), (-138.719566803, -16.521857823), (-138.675364887, -16.888847605))
            Line((-138.675364887, -16.888847605), (-138.122689066, -48.551624174))
            ThreePointArc((-138.122689066, -48.551624174), (-143.451229081, -32.201838816), (-153.609478479, -18.326724794))
        make_face()
    extrude(amount=-MOTOR_SIDE_THICKENING_DEPTH)


solid = part.part
